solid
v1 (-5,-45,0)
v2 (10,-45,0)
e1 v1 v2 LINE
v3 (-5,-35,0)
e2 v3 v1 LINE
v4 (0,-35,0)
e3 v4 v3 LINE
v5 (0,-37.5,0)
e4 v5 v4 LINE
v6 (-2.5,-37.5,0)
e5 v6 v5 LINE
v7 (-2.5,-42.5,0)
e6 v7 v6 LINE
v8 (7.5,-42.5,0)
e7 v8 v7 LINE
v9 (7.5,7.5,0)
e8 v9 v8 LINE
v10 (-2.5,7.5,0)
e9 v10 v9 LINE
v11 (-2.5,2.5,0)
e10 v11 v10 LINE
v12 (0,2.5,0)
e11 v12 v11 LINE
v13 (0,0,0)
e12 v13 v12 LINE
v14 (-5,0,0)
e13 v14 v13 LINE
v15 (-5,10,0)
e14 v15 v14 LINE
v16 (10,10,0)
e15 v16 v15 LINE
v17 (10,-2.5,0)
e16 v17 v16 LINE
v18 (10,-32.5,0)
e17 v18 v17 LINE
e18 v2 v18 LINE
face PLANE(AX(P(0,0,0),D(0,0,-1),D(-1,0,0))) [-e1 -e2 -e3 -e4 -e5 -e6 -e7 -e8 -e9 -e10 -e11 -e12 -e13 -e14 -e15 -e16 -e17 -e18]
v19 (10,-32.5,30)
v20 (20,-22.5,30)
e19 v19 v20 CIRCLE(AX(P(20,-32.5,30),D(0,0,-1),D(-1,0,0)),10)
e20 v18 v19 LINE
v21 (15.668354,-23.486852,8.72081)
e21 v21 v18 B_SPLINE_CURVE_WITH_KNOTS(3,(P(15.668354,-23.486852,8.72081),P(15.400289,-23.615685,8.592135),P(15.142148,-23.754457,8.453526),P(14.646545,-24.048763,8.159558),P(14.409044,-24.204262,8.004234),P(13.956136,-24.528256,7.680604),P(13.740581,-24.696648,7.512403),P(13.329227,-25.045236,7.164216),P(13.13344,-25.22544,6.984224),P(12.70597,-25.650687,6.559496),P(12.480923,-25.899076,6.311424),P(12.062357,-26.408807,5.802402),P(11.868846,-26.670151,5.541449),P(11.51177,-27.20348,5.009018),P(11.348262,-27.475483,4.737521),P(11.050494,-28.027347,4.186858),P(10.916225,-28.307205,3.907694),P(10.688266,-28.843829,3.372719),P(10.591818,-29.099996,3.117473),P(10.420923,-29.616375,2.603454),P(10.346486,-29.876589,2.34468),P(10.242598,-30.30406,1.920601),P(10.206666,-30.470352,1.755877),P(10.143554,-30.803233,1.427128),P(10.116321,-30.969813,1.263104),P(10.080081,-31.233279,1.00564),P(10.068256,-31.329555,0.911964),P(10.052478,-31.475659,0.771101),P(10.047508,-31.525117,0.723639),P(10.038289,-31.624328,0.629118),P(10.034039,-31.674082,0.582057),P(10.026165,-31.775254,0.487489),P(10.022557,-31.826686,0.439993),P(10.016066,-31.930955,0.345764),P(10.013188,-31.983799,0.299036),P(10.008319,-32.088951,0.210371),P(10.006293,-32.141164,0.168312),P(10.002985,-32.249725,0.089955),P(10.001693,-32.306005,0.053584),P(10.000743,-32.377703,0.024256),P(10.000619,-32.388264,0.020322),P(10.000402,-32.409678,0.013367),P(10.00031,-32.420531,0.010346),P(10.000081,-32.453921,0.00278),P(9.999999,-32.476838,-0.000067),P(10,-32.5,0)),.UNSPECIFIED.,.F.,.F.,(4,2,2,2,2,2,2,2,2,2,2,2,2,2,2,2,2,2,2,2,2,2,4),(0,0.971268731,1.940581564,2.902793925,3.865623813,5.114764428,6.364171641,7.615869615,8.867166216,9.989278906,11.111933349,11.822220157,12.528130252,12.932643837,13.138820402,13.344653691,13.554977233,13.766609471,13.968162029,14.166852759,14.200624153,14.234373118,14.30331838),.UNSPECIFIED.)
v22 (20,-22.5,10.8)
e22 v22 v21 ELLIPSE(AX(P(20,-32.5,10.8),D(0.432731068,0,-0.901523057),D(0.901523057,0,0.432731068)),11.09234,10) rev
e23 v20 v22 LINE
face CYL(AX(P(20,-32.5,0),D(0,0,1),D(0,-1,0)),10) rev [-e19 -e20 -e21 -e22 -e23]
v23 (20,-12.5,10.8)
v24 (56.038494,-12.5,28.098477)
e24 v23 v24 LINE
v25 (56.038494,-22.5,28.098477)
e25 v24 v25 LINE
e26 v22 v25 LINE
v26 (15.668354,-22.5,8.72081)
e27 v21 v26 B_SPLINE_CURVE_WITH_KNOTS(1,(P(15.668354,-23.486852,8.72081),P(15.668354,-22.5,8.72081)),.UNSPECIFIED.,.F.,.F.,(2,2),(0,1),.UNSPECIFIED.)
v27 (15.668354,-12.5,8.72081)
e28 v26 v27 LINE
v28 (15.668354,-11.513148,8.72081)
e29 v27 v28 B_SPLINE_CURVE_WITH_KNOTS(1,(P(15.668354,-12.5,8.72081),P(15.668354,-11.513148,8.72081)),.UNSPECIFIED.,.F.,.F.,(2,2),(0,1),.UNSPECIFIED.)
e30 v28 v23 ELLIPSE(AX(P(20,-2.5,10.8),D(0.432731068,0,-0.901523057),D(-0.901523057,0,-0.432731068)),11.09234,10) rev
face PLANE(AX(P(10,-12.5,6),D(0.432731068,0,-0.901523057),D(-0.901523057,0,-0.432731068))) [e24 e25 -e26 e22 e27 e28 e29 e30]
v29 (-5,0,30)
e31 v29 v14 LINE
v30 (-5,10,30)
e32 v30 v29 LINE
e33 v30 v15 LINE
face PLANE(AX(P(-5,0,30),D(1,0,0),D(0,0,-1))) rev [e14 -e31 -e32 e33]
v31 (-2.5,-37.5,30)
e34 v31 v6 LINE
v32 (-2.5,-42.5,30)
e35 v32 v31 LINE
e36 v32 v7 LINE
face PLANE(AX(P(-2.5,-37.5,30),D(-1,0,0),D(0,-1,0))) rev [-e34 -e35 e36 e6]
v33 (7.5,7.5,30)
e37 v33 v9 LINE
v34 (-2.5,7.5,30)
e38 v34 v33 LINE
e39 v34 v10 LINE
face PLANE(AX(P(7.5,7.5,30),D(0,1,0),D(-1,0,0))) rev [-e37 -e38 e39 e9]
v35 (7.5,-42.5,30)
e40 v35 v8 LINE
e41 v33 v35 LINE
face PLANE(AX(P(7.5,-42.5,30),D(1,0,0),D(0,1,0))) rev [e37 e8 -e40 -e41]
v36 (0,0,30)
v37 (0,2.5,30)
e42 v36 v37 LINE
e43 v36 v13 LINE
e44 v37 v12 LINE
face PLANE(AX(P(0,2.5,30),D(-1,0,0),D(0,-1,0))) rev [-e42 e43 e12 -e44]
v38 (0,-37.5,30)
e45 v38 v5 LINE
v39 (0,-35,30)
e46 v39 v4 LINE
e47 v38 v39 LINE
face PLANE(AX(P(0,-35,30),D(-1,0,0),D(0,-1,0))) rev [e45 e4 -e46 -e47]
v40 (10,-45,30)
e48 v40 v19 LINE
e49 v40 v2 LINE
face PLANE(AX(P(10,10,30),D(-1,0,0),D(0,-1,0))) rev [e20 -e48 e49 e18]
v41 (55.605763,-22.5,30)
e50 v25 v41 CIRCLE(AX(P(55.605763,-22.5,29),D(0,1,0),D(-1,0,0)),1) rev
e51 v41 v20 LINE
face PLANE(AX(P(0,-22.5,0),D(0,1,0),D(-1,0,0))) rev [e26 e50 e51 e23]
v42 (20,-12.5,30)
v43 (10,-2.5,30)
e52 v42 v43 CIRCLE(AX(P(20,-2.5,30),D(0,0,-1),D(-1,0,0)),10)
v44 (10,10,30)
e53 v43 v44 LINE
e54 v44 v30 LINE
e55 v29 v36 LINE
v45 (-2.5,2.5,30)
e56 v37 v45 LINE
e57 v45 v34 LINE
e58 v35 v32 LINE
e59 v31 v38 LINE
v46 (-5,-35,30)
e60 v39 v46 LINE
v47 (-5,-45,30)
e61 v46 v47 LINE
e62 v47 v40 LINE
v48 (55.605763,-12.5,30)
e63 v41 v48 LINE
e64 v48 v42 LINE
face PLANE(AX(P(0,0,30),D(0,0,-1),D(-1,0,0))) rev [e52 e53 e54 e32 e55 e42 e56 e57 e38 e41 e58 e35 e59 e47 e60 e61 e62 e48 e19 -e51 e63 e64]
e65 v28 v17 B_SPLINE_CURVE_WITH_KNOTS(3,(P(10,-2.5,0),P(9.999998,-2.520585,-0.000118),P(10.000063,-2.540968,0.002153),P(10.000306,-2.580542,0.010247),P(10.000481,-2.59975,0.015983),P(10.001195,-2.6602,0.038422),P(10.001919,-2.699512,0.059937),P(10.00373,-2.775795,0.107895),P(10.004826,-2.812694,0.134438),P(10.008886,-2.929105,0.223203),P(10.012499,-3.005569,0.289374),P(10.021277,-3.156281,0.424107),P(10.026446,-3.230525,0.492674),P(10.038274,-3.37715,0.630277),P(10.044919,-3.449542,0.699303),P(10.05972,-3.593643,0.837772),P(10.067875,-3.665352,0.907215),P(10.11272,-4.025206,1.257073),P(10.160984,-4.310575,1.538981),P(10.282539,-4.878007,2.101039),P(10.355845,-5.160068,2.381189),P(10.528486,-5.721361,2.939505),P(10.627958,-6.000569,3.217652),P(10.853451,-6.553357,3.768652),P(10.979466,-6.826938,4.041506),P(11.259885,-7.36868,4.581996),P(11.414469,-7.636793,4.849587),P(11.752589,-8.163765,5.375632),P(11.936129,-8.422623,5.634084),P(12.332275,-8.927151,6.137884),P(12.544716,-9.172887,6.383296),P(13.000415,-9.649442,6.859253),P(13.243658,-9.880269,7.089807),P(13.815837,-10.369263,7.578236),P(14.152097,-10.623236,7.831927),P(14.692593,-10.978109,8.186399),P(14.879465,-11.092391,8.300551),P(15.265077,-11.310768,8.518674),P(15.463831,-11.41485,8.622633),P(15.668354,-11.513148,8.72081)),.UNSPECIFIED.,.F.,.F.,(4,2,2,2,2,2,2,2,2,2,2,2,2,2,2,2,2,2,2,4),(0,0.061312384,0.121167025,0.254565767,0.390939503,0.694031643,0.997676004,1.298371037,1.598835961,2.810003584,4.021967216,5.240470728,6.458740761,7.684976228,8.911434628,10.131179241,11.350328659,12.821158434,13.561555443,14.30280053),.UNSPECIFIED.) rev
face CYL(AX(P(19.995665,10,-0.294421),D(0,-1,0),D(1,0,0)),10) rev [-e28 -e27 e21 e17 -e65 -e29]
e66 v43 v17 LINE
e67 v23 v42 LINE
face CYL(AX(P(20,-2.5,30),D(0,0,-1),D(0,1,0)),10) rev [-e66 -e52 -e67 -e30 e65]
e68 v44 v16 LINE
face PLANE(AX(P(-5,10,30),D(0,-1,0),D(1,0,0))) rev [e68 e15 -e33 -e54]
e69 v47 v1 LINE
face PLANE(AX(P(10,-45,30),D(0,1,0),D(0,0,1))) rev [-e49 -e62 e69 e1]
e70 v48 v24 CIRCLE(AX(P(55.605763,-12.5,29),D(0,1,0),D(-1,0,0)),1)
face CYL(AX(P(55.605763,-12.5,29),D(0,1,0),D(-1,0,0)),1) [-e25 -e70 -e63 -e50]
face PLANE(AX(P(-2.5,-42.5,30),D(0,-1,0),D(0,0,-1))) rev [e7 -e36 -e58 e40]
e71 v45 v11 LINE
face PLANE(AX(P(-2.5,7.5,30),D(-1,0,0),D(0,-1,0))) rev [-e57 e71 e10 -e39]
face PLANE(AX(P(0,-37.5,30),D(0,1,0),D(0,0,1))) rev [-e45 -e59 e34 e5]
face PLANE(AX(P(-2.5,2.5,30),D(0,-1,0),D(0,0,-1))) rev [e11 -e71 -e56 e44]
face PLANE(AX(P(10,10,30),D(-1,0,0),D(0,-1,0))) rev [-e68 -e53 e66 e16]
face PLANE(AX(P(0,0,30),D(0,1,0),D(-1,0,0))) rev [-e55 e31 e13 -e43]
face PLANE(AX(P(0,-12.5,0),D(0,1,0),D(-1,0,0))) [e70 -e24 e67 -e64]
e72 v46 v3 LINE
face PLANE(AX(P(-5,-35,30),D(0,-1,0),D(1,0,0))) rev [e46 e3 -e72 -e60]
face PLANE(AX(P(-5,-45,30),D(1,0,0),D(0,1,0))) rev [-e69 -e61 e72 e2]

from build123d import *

# Parameters (mm, degrees)
BOSS_EXTRUDE1_DEPTH      = 30
BOSS_EXTRUDE2_DEPTH      = 5
BOSS_EXTRUDE2_DEPTH_BACK = 5
FILLET1_R                = 10
FILLET2_R                = 1


with BuildPart() as part:
    # Sketch2 → Boss-Extrude1 (new body)
    with BuildSketch(Plane.XY):
        Polygon((0, 0), (-5, 0), (-5, 10), (10, 10), (10, -45), (-5, -45), (-5, -35), (0, -35), (0, -37.5), (-2.5, -37.5), (-2.5, -42.5), (7.5, -42.5), (7.5, 7.5), (-2.5, 7.5), (-2.5, 2.5), (0, 2.5), align=None)
    extrude(amount=BOSS_EXTRUDE1_DEPTH)

    # Sketch3 → Boss-Extrude2 (add, two sides: drawn at the far end of the back side and taken through both)
    with BuildSketch(Plane(origin=(0, -17.5, 0), x_dir=(-1, 0, 0), z_dir=(0, -1, 0)).offset(-BOSS_EXTRUDE2_DEPTH_BACK)):
        Polygon((-10, -6), (-60, -30), (-10, -30), align=None)
    extrude(amount=BOSS_EXTRUDE2_DEPTH + BOSS_EXTRUDE2_DEPTH_BACK)

    # Fillet1
    # the kernel refuses this fillet: 10 mm, written as the material it adds along each edge
    with BuildSketch(Plane(origin=(10, -22.5, 6), x_dir=(0, 0, -1), z_dir=(0, 1, 0))) as fillet1_piece_1:
        with BuildLine():
            CenterArc((6.294420553, -9.995664887), FILLET1_R, 91.687149317, 62.671844859)
            Line((-2.720810021, -5.668354211), (0, 0))
            Line((0, 0), (6, 0))
        make_face()
    extrude(amount=10)
    with BuildSketch(Plane(origin=(10, -12.5, 30), x_dir=(0, 1, 0), z_dir=(0, 0, -1))) as fillet1_piece_2_section:
        with BuildLine():
            CenterArc((FILLET1_R, FILLET1_R), FILLET1_R, 180, 90)
            Line((0, FILLET1_R), (0, 0))
            Line((0, 0), (FILLET1_R, 0))
        make_face()
    fillet1_piece_2 = extrude(amount=49, mode=Mode.PRIVATE)
    fillet1_piece_2 = split(fillet1_piece_2, bisect_by=Plane(origin=(19.362808843, -12.5, 10.494148244), z_dir=(-0.4327310675847713, 0, 0.9015230574682737)), keep=Keep.TOP, mode=Mode.PRIVATE)
    add(fillet1_piece_2)
    with BuildSketch(Plane(origin=(10, -22.5, 30), x_dir=(0, -1, 0), z_dir=(0, 0, -1))) as fillet1_piece_3_section:
        with BuildLine():
            CenterArc((FILLET1_R, -FILLET1_R), FILLET1_R, 90, 90)
            Line((0, -FILLET1_R), (0, 0))
            Line((0, 0), (FILLET1_R, 0))
        make_face()
    fillet1_piece_3 = extrude(amount=49, mode=Mode.PRIVATE)
    fillet1_piece_3 = split(fillet1_piece_3, bisect_by=Plane(origin=(19.362808843, -22.5, 10.494148244), z_dir=(-0.4327310675847713, 0, 0.9015230574682737)), keep=Keep.TOP, mode=Mode.PRIVATE)
    add(fillet1_piece_3)
    with BuildSketch(Plane(origin=(10, -22.5, 30), x_dir=(0, -1, 0), z_dir=(0, 0, -1))) as fillet1_piece_4a_section:
        with BuildLine():
            CenterArc((FILLET1_R, -FILLET1_R), FILLET1_R, 90, 90)
            Line((0, -FILLET1_R), (0, 0))
            Line((0, 0), (FILLET1_R, 0))
        make_face()
    fillet1_piece_4a = extrude(amount=49, mode=Mode.PRIVATE)
    fillet1_piece_4a = split(fillet1_piece_4a, bisect_by=Plane(origin=(10, -22.5, 0), z_dir=(0, 0, 1)), keep=Keep.TOP, mode=Mode.PRIVATE)
    fillet1_piece_4a = split(fillet1_piece_4a, bisect_by=Plane(origin=(19.362808843, -22.5, 10.494148244), z_dir=(0.4327310675847713, 0, -0.9015230574682737)), keep=Keep.TOP, mode=Mode.PRIVATE)
    with BuildSketch(Plane(origin=(10, -38.218827612, 6), x_dir=(0, 0, -1), z_dir=(0, 1, 0))) as fillet1_piece_4b_section:
        with BuildLine():
            CenterArc((6.294420553, -9.995664887), FILLET1_R, 91.687149317, 62.671844859)
            Line((-2.720810021, -5.668354211), (0, 0))
            Line((0, 0), (6, 0))
        make_face()
    fillet1_piece_4b = extrude(amount=25.718827612, mode=Mode.PRIVATE)
    fillet1_piece_4b = split(fillet1_piece_4b, bisect_by=Plane(origin=(10, -22.5, 6), z_dir=(0, -1, 0)), keep=Keep.TOP, mode=Mode.PRIVATE)
    fillet1_piece_4 = fillet1_piece_4a & fillet1_piece_4b
    add(fillet1_piece_4)
    with BuildSketch(Plane(origin=(10, -22.5, 6), x_dir=(0, 0, -1), z_dir=(0, 1, 0))) as fillet1_piece_5a_section:
        with BuildLine():
            CenterArc((6.294420553, -9.995664887), FILLET1_R, 91.687149317, 62.671844859)
            Line((-2.720810021, -5.668354211), (0, 0))
            Line((0, 0), (6, 0))
        make_face()
    fillet1_piece_5a = extrude(amount=25.718827612, mode=Mode.PRIVATE)
    fillet1_piece_5a = split(fillet1_piece_5a, bisect_by=Plane(origin=(10, -12.5, 6), z_dir=(0, 1, 0)), keep=Keep.TOP, mode=Mode.PRIVATE)
    with BuildSketch(Plane(origin=(10, -12.5, 30), x_dir=(0, 1, 0), z_dir=(0, 0, -1))) as fillet1_piece_5b_section:
        with BuildLine():
            CenterArc((FILLET1_R, FILLET1_R), FILLET1_R, 180, 90)
            Line((0, FILLET1_R), (0, 0))
            Line((0, 0), (FILLET1_R, 0))
        make_face()
    fillet1_piece_5b = extrude(amount=49, mode=Mode.PRIVATE)
    fillet1_piece_5b = split(fillet1_piece_5b, bisect_by=Plane(origin=(10, -12.5, 0), z_dir=(0, 0, 1)), keep=Keep.TOP, mode=Mode.PRIVATE)
    fillet1_piece_5b = split(fillet1_piece_5b, bisect_by=Plane(origin=(19.362808843, -12.5, 10.494148244), z_dir=(0.4327310675847713, 0, -0.9015230574682737)), keep=Keep.TOP, mode=Mode.PRIVATE)
    fillet1_piece_5 = fillet1_piece_5a & fillet1_piece_5b
    add(fillet1_piece_5)

    # Fillet2
    fillet2_edges = [part.edges().sort_by_distance(p)[0] for p in [
        (60, -17.5, 30),
    ]]
    fillet(fillet2_edges, radius=FILLET2_R)


solid = part.part
